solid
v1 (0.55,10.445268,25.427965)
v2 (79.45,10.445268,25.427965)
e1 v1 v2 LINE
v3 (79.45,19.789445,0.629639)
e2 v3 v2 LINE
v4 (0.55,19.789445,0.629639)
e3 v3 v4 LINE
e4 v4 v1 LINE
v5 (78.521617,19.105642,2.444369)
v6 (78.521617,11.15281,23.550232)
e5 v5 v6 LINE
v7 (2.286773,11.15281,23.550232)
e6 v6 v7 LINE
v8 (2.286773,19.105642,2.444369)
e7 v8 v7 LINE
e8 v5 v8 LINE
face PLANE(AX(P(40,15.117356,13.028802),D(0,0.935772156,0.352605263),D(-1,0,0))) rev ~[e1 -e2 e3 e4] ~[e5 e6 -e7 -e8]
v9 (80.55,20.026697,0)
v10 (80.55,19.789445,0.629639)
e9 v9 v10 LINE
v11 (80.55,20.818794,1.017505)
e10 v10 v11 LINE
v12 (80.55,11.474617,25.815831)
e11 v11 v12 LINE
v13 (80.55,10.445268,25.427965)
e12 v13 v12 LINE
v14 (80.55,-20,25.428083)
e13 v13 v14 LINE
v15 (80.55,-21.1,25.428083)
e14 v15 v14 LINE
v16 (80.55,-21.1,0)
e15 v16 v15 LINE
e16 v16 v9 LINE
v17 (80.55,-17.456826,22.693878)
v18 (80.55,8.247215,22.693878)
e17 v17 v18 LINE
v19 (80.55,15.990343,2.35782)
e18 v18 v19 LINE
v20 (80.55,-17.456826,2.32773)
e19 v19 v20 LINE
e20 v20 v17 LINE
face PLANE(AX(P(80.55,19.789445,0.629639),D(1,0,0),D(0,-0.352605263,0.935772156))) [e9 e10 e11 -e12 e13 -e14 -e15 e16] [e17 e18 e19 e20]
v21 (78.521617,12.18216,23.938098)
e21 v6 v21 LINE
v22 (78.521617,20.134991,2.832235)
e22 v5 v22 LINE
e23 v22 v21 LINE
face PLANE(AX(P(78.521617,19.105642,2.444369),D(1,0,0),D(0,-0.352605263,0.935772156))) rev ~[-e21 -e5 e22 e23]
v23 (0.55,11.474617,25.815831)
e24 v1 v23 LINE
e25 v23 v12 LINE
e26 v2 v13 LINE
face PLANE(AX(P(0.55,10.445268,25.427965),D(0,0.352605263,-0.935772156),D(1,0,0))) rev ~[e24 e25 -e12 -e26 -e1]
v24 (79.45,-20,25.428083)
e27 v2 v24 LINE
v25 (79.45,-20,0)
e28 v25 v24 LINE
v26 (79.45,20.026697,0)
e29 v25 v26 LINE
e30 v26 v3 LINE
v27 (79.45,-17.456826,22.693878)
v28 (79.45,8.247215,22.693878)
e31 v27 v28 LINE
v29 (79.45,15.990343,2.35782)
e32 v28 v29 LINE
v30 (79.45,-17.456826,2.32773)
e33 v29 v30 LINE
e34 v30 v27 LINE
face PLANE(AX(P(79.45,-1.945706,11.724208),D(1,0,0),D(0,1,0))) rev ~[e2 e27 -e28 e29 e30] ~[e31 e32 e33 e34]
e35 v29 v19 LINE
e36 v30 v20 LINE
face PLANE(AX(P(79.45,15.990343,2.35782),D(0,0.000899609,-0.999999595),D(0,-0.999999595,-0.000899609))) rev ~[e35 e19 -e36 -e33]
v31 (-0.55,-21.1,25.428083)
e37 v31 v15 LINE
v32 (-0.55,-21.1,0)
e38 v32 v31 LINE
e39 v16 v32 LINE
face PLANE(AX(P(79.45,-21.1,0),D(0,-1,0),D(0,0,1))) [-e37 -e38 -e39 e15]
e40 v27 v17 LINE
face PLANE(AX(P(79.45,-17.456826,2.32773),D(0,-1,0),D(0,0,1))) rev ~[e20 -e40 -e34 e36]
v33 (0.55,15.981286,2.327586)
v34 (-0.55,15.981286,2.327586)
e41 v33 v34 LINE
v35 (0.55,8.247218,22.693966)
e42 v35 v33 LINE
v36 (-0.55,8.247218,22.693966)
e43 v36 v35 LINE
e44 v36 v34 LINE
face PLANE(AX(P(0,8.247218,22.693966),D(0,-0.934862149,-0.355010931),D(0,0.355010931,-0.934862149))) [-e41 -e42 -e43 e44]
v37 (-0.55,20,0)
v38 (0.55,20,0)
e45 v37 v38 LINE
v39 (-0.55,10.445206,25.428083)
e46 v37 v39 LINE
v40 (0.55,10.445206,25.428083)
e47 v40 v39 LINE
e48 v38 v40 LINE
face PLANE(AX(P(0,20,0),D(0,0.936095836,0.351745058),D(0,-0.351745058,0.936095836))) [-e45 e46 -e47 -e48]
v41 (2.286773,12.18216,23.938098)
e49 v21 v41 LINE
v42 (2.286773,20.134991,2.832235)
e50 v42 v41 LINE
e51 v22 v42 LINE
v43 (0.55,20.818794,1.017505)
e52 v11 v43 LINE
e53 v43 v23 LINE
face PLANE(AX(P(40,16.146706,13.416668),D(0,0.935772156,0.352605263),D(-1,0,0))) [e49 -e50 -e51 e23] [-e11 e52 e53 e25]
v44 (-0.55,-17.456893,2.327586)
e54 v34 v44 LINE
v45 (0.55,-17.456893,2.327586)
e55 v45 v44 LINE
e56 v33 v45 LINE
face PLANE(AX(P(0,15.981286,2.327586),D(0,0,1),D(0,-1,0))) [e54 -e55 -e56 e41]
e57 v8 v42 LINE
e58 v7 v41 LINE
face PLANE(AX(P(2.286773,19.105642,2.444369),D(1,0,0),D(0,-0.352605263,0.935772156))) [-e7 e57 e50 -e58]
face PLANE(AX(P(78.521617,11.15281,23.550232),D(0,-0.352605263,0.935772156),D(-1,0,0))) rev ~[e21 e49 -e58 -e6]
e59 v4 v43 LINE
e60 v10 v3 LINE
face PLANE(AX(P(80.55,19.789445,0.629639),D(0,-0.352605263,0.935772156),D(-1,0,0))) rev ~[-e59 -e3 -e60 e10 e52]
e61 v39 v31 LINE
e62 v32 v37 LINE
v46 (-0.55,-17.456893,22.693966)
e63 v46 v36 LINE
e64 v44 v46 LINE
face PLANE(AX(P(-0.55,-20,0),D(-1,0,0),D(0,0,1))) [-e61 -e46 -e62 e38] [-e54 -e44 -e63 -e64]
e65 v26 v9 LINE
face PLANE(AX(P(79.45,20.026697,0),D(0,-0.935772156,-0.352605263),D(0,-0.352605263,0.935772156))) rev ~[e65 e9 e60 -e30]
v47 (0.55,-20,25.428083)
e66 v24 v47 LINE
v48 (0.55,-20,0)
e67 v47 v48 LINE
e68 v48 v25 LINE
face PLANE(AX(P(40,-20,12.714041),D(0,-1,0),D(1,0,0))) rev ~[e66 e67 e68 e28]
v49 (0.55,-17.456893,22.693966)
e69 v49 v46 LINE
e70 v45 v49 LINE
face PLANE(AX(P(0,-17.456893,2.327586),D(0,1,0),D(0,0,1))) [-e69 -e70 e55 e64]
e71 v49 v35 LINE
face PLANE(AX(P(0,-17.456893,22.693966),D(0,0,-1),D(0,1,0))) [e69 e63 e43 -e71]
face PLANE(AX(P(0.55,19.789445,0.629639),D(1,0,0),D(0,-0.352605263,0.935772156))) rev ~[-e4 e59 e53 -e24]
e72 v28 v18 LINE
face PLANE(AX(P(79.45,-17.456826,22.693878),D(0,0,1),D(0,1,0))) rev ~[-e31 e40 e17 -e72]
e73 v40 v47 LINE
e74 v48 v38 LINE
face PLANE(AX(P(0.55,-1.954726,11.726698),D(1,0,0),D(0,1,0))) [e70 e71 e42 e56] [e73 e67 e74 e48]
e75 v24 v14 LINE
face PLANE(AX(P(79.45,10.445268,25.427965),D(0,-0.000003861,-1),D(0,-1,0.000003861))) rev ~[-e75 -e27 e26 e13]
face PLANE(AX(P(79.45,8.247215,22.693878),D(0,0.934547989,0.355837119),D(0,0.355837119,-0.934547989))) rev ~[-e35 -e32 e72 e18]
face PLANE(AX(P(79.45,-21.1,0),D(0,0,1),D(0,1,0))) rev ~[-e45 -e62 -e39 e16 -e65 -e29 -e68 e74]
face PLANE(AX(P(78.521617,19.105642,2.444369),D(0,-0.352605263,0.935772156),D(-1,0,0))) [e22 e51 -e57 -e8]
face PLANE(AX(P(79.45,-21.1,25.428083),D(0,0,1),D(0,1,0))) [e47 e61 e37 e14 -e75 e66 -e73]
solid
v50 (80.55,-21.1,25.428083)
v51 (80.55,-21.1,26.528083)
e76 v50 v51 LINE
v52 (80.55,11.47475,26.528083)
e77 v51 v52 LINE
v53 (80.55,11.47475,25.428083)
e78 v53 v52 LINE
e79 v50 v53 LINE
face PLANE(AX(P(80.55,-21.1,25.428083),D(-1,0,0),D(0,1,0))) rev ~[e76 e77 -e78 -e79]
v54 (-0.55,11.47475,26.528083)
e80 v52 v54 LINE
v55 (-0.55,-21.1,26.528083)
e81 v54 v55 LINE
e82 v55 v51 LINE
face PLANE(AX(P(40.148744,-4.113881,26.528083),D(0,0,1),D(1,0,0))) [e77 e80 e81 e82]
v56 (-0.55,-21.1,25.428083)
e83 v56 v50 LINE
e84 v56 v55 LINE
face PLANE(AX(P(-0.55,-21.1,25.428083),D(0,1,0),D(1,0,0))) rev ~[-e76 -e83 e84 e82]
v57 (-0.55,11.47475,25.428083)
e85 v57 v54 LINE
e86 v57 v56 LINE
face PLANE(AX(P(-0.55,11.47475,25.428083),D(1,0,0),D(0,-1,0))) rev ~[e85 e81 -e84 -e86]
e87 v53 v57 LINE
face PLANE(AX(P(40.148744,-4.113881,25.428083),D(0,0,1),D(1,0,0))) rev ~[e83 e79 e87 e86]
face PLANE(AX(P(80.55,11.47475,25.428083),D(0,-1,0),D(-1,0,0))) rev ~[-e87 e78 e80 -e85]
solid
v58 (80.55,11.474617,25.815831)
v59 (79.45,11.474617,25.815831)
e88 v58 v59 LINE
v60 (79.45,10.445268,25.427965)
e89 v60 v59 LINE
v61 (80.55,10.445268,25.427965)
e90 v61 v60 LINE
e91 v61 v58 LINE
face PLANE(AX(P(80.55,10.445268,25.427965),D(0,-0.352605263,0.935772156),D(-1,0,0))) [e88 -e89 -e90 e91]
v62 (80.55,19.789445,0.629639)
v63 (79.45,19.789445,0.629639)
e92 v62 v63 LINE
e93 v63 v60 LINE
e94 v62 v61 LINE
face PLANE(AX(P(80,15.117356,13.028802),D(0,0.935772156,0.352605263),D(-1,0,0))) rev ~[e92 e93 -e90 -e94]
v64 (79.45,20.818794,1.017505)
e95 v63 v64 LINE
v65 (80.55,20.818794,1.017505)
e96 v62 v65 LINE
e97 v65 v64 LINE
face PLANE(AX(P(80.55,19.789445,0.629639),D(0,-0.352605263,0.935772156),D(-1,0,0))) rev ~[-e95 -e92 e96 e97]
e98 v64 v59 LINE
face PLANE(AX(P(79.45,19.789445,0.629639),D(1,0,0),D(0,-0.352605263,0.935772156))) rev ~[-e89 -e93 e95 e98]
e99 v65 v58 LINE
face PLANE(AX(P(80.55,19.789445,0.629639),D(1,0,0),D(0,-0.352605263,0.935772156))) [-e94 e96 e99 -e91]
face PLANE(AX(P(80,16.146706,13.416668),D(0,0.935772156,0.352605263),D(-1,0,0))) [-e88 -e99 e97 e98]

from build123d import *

# Parameters (mm, degrees)
F1_DEPTH  = 0.55
F2_W      = 78.9
F2_H      = 25.4280829926
F2_W_2    = 1.1
F3_DEPTH  = 1.1
F4_W      = 1.1
F4_H      = 25.4280829926
F5_DEPTH  = 1.1
F6_W      = 78.9
F6_H      = 26.5003892772
F6_W_2    = 76.2348438147
F6_H_2    = 22.5544893183
F6_W_3    = 1.1
F7_DEPTH  = 1.1
F8_DEPTH  = 1.1
F10_DEPTH = 1.1


# Not quite as in the source:
# - ends of sketch curves that miss each other by under 0.0002 mm in the source are joined
# - a feature names something its author has since deleted; it is built from what else it names


with BuildPart() as f1:
    # F0 (on Right) → F1 (new body, symmetric)
    with BuildSketch(Plane.YZ):
        Polygon((-20, 25.4280829926), (-20, 0), (-0.7378033123, 0), (0, 0), (20, 0), (10.4452063715, 25.4280829926), align=None)
        Polygon((8.2472184154, 22.693965584), (15.9812862531, 2.3275862914), (-17.4568928778, 2.3275862914), (-17.4568928778, 22.693965584), align=None, mode=Mode.SUBTRACT)
    extrude(amount=F1_DEPTH, both=True)

    # F2 (on face) → F3 (join)
    with BuildSketch(Plane.XZ.offset(20)):
        with Locations((40, 12.7140414963)):
            Rectangle(F2_W, F2_H)
        with Locations((0, 12.7140414963)):
            Rectangle(F2_W_2, F2_H)
    extrude(amount=F3_DEPTH)

    # F4 (on face) → F5 (join)
    with BuildSketch(Plane.YZ.offset(79.45)):
        Polygon((-20, 25.4280829926), (-20, 0), (0, 0), (20.0266968459, 0), (10.4452678934, 25.4279654473), align=None)
        Polygon((8.2472153008, 22.6938780397), (15.9903429449, 2.3578198161), (-17.4568258226, 2.3277304135), (-17.4568258226, 22.6938780397), align=None, mode=Mode.SUBTRACT)
        with Locations((-20.55, 12.7140414963)):
            Rectangle(F4_W, F4_H)
    extrude(amount=F5_DEPTH)

    # F6 (on face) → F7 (join)
    with BuildSketch(Plane(origin=(0, 17.5367681908, 6.6079725814), x_dir=(-1, 0, 0), z_dir=(0, 0.9357721565, 0.3526052626))):
        with Locations((-40, 6.8615309945)):
            Rectangle(F6_W, F6_H)
        with Locations((-40.4041948495, 6.8278673571)):
            Rectangle(F6_W_2, F6_H_2, mode=Mode.SUBTRACT)
        with Locations((-80, 6.8615309945)):
            Rectangle(F6_W_3, F6_H)
    extrude(amount=F7_DEPTH)


with BuildPart() as f8:
    # F6 (on face) → F8 (new body)
    with BuildSketch(Plane(origin=(0, 17.5367681908, 6.6079725814), x_dir=(-1, 0, 0), z_dir=(0, 0.9357721565, 0.3526052626))):
        with Locations((-80, 6.8615309945)):
            Rectangle(F6_W_3, F6_H)
    extrude(amount=F8_DEPTH)


with BuildPart() as f10:
    # F9 (on face) → F10 (new body)
    with BuildSketch(Plane.XY.offset(25.4280829926)):
        Polygon((79.45, -20), (80.55, -20), (80.55, 11.4747500047), (-0.55, 11.4747500047), (-0.55, 10.4452063715), (0.55, 10.4452063715), (0.55, -20), align=None)
        Polygon((-0.55, -21.1), (80.55, -21.1), (80.55, -20), (79.45, -20), (0.55, -20), (0.55, 10.4452063715), (-0.55, 10.4452063715), align=None)
    extrude(amount=F10_DEPTH)


solid = Compound([f1.part, f8.part, f10.part])
